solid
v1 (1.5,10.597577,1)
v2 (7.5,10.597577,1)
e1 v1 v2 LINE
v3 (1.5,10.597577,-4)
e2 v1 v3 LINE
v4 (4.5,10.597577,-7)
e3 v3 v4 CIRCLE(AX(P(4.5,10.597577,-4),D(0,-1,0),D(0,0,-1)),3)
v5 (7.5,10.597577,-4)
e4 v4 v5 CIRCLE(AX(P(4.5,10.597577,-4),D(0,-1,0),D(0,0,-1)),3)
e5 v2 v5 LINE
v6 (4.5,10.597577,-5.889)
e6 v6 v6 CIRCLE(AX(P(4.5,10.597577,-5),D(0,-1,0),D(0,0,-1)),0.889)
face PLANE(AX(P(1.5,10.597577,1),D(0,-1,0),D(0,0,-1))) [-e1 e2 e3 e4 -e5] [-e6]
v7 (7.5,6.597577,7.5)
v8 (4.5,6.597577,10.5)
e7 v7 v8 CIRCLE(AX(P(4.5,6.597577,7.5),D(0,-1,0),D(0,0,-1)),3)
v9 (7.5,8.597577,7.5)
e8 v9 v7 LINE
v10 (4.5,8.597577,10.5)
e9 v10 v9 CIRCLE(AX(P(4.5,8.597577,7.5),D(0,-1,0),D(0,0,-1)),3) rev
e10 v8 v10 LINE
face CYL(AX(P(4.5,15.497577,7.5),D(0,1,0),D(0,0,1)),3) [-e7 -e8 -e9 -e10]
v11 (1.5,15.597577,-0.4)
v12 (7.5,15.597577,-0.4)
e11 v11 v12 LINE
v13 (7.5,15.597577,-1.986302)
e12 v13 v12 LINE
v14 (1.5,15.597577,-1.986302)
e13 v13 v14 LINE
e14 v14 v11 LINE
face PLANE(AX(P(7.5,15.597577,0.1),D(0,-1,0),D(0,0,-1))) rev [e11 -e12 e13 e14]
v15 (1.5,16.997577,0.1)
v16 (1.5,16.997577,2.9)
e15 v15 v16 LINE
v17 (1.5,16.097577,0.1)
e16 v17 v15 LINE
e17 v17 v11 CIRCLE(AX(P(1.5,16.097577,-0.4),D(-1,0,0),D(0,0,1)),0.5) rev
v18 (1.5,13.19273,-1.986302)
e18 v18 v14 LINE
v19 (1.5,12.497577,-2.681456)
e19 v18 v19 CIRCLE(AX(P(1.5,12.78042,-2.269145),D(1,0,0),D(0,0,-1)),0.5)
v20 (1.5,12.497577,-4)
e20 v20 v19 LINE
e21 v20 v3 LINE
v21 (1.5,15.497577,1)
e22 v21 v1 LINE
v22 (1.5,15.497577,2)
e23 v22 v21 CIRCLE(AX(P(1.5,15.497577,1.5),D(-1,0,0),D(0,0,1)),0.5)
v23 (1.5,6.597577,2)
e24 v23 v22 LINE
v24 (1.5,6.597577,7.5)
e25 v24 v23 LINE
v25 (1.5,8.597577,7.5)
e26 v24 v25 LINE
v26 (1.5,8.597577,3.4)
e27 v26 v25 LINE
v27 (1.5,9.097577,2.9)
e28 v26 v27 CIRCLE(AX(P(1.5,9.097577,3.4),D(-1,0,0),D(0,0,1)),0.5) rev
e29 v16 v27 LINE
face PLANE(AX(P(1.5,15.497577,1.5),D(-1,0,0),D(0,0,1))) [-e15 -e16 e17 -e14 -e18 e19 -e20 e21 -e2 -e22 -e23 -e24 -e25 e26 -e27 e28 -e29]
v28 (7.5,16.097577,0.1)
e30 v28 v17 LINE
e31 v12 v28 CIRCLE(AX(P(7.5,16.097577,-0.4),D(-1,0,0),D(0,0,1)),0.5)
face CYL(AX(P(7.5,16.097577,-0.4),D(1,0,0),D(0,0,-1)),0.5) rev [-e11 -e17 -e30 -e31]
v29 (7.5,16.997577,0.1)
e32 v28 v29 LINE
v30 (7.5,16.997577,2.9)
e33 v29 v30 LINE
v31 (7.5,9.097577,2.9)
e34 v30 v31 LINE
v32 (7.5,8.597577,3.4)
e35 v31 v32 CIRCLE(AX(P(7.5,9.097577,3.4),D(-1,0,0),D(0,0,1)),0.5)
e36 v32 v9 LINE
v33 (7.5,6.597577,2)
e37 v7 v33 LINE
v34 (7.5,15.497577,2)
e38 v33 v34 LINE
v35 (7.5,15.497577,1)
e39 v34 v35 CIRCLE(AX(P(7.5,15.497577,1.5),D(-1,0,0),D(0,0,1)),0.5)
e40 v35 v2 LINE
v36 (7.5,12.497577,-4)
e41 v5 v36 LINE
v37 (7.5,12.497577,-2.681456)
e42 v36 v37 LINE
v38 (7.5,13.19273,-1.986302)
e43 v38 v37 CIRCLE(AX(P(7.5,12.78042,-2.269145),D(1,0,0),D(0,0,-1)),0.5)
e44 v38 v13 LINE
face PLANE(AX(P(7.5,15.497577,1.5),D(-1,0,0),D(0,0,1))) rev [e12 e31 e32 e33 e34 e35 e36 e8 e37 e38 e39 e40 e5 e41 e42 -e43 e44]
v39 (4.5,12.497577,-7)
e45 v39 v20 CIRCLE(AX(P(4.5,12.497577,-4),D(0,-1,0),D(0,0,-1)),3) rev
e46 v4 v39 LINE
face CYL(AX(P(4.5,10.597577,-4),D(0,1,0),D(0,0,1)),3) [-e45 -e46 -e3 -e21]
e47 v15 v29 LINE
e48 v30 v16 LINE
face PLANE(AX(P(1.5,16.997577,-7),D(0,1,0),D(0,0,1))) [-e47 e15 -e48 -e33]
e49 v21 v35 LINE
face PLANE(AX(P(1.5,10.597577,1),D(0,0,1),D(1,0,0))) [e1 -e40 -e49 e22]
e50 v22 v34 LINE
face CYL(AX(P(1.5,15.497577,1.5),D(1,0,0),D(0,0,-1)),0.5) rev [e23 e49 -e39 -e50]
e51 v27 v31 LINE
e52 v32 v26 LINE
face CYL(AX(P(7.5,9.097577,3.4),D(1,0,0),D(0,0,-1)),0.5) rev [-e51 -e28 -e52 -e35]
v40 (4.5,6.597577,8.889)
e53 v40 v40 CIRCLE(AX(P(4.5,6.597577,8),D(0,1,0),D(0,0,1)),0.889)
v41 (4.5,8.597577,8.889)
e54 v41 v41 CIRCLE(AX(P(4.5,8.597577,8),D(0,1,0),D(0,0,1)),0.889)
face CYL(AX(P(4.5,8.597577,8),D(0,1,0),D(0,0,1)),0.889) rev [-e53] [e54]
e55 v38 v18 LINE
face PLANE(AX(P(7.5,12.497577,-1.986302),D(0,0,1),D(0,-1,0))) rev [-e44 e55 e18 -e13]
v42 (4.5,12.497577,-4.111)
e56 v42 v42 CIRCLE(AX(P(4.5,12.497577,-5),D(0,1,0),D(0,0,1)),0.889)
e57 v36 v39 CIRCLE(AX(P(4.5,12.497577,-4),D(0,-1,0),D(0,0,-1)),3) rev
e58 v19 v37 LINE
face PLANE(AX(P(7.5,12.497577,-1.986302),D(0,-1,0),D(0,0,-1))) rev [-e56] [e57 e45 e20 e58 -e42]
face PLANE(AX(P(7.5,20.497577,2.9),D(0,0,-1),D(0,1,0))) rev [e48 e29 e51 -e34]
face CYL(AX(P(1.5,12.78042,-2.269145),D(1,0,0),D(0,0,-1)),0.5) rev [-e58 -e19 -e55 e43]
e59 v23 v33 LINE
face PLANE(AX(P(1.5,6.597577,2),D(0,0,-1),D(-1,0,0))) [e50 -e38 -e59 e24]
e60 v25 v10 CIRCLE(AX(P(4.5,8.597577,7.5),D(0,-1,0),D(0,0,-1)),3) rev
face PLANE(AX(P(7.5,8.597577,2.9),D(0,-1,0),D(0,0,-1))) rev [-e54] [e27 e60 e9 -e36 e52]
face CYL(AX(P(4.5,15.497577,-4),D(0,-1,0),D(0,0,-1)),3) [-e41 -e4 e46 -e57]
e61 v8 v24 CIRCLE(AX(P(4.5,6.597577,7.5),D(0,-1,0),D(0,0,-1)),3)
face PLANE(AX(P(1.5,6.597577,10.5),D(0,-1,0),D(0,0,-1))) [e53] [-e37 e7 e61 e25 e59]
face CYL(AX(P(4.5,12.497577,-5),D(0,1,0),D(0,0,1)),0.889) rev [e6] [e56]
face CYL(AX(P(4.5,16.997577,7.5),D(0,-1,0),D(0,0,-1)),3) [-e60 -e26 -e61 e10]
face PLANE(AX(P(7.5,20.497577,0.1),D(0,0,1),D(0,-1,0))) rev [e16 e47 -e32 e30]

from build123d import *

# Parameters (mm, degrees)
BOSS_EXTRUDE1_DEPTH   = 6
SKETCH3_W             = 7.6
SKETCH3_H             = 8.4
SKETCH3_H_2           = 4.9
CUT_EXTRUDE2_DEPTH    = 21.860671783
SKETCH4_W             = 7.6
SKETCH4_H             = 3.5
SKETCH4_W_2           = 5.5
SKETCH4_H_2           = 3.1
CUT_EXTRUDE3_DEPTH    = 21.860671783
FILLET2_R             = 3
F_2_56_TAPPED_HOLE1_D = 1.778
FILLET3_R             = 0.5
F_2_56_TAPPED_HOLE2_D = 1.778
SKETCH19_R            = 0.5
CUT_EXTRUDE6_DEPTH    = 21.860671783


with BuildPart() as part:
    # Sketch1 → Boss-Extrude1 (new body)
    with BuildSketch(Plane(origin=(7.5, 0, 0), x_dir=(0, 0, -1), z_dir=(1, 0, 0))):
        with BuildLine():
            Line((-10.5, 16.997577099), (-10.5, 6.597577099))
            Line((-10.5, 6.597577099), (-2, 6.597577099))
            Line((-2, 6.597577099), (-2, 15.497577099))
            ThreePointArc((-2, 15.497577099), (-1.5, 15.997577099), (-1, 15.497577099))
            Line((-1, 15.497577099), (-1, 10.597577099))
            Line((-1, 10.597577099), (7, 10.597577099))
            Line((7, 10.597577099), (7, 16.997577099))
            Line((7, 16.997577099), (-10.5, 16.997577099))
        make_face()
    extrude(amount=-BOSS_EXTRUDE1_DEPTH)

    # Sketch3 → Cut-Extrude2 (cut, through all)
    with BuildSketch(Plane.ZY.offset(-1.5)):
        with Locations((6.7, 16.297577099)):
            Rectangle(SKETCH3_W, SKETCH3_H)
        with Locations((-3.7, 18.047577099)):
            Rectangle(SKETCH3_W, SKETCH3_H_2)
    extrude(amount=-CUT_EXTRUDE2_DEPTH, mode=Mode.SUBTRACT)

    # Sketch4 → Cut-Extrude3 (cut, through all)
    with BuildSketch(Plane.ZY.offset(-1.5)):
        with Locations((6.7, 10.347577099)):
            Rectangle(SKETCH4_W, SKETCH4_H)
        with Locations((-4.736302331, 14.047577099)):
            Rectangle(SKETCH4_W_2, SKETCH4_H_2)
    extrude(amount=-CUT_EXTRUDE3_DEPTH, mode=Mode.SUBTRACT)

    # Fillet2
    fillet2_edges = [part.edges().sort_by_distance(p)[0] for p in [
        (1.5, 7.597577099, 10.5),
        (7.5, 7.597577099, 10.5),
        (7.5, 11.547577099, -7),
        (1.5, 11.547577099, -7),
    ]]
    fillet(fillet2_edges, radius=FILLET2_R - 0.0001)  # a hair under: the kernel refuses the full size

    # #2-56 Tapped Hole1 (through all)
    with Locations(Plane(origin=(0, 8.597577099, 0), x_dir=(1, 0, 0), z_dir=(0, 1, 0))):
        with Locations((4.5, -8)):
            Hole(F_2_56_TAPPED_HOLE1_D / 2)

    # Fillet3
    fillet3_edges = [part.edges().sort_by_distance(p)[0] for p in [
        (4.5, 15.597577099, 0.1),
        (4.5, 8.597577099, 2.9),
    ]]
    fillet(fillet3_edges, radius=FILLET3_R)

    # #2-56 Tapped Hole2 (through all)
    with Locations(Plane(origin=(0, 12.497577099, 0), x_dir=(1, 0, 0), z_dir=(0, 1, 0))):
        with Locations((4.5, 5)):
            Hole(F_2_56_TAPPED_HOLE2_D / 2)

    # Sketch19 → Cut-Extrude6 (cut, through all)
    with BuildSketch(Plane(origin=(7.5, 0, 0), x_dir=(0, 0, -1), z_dir=(1, 0, 0))):
        with Locations((2.269145043, 12.780419811)):
            Circle(SKETCH19_R)
    extrude(amount=-CUT_EXTRUDE6_DEPTH, mode=Mode.SUBTRACT)


solid = part.part
